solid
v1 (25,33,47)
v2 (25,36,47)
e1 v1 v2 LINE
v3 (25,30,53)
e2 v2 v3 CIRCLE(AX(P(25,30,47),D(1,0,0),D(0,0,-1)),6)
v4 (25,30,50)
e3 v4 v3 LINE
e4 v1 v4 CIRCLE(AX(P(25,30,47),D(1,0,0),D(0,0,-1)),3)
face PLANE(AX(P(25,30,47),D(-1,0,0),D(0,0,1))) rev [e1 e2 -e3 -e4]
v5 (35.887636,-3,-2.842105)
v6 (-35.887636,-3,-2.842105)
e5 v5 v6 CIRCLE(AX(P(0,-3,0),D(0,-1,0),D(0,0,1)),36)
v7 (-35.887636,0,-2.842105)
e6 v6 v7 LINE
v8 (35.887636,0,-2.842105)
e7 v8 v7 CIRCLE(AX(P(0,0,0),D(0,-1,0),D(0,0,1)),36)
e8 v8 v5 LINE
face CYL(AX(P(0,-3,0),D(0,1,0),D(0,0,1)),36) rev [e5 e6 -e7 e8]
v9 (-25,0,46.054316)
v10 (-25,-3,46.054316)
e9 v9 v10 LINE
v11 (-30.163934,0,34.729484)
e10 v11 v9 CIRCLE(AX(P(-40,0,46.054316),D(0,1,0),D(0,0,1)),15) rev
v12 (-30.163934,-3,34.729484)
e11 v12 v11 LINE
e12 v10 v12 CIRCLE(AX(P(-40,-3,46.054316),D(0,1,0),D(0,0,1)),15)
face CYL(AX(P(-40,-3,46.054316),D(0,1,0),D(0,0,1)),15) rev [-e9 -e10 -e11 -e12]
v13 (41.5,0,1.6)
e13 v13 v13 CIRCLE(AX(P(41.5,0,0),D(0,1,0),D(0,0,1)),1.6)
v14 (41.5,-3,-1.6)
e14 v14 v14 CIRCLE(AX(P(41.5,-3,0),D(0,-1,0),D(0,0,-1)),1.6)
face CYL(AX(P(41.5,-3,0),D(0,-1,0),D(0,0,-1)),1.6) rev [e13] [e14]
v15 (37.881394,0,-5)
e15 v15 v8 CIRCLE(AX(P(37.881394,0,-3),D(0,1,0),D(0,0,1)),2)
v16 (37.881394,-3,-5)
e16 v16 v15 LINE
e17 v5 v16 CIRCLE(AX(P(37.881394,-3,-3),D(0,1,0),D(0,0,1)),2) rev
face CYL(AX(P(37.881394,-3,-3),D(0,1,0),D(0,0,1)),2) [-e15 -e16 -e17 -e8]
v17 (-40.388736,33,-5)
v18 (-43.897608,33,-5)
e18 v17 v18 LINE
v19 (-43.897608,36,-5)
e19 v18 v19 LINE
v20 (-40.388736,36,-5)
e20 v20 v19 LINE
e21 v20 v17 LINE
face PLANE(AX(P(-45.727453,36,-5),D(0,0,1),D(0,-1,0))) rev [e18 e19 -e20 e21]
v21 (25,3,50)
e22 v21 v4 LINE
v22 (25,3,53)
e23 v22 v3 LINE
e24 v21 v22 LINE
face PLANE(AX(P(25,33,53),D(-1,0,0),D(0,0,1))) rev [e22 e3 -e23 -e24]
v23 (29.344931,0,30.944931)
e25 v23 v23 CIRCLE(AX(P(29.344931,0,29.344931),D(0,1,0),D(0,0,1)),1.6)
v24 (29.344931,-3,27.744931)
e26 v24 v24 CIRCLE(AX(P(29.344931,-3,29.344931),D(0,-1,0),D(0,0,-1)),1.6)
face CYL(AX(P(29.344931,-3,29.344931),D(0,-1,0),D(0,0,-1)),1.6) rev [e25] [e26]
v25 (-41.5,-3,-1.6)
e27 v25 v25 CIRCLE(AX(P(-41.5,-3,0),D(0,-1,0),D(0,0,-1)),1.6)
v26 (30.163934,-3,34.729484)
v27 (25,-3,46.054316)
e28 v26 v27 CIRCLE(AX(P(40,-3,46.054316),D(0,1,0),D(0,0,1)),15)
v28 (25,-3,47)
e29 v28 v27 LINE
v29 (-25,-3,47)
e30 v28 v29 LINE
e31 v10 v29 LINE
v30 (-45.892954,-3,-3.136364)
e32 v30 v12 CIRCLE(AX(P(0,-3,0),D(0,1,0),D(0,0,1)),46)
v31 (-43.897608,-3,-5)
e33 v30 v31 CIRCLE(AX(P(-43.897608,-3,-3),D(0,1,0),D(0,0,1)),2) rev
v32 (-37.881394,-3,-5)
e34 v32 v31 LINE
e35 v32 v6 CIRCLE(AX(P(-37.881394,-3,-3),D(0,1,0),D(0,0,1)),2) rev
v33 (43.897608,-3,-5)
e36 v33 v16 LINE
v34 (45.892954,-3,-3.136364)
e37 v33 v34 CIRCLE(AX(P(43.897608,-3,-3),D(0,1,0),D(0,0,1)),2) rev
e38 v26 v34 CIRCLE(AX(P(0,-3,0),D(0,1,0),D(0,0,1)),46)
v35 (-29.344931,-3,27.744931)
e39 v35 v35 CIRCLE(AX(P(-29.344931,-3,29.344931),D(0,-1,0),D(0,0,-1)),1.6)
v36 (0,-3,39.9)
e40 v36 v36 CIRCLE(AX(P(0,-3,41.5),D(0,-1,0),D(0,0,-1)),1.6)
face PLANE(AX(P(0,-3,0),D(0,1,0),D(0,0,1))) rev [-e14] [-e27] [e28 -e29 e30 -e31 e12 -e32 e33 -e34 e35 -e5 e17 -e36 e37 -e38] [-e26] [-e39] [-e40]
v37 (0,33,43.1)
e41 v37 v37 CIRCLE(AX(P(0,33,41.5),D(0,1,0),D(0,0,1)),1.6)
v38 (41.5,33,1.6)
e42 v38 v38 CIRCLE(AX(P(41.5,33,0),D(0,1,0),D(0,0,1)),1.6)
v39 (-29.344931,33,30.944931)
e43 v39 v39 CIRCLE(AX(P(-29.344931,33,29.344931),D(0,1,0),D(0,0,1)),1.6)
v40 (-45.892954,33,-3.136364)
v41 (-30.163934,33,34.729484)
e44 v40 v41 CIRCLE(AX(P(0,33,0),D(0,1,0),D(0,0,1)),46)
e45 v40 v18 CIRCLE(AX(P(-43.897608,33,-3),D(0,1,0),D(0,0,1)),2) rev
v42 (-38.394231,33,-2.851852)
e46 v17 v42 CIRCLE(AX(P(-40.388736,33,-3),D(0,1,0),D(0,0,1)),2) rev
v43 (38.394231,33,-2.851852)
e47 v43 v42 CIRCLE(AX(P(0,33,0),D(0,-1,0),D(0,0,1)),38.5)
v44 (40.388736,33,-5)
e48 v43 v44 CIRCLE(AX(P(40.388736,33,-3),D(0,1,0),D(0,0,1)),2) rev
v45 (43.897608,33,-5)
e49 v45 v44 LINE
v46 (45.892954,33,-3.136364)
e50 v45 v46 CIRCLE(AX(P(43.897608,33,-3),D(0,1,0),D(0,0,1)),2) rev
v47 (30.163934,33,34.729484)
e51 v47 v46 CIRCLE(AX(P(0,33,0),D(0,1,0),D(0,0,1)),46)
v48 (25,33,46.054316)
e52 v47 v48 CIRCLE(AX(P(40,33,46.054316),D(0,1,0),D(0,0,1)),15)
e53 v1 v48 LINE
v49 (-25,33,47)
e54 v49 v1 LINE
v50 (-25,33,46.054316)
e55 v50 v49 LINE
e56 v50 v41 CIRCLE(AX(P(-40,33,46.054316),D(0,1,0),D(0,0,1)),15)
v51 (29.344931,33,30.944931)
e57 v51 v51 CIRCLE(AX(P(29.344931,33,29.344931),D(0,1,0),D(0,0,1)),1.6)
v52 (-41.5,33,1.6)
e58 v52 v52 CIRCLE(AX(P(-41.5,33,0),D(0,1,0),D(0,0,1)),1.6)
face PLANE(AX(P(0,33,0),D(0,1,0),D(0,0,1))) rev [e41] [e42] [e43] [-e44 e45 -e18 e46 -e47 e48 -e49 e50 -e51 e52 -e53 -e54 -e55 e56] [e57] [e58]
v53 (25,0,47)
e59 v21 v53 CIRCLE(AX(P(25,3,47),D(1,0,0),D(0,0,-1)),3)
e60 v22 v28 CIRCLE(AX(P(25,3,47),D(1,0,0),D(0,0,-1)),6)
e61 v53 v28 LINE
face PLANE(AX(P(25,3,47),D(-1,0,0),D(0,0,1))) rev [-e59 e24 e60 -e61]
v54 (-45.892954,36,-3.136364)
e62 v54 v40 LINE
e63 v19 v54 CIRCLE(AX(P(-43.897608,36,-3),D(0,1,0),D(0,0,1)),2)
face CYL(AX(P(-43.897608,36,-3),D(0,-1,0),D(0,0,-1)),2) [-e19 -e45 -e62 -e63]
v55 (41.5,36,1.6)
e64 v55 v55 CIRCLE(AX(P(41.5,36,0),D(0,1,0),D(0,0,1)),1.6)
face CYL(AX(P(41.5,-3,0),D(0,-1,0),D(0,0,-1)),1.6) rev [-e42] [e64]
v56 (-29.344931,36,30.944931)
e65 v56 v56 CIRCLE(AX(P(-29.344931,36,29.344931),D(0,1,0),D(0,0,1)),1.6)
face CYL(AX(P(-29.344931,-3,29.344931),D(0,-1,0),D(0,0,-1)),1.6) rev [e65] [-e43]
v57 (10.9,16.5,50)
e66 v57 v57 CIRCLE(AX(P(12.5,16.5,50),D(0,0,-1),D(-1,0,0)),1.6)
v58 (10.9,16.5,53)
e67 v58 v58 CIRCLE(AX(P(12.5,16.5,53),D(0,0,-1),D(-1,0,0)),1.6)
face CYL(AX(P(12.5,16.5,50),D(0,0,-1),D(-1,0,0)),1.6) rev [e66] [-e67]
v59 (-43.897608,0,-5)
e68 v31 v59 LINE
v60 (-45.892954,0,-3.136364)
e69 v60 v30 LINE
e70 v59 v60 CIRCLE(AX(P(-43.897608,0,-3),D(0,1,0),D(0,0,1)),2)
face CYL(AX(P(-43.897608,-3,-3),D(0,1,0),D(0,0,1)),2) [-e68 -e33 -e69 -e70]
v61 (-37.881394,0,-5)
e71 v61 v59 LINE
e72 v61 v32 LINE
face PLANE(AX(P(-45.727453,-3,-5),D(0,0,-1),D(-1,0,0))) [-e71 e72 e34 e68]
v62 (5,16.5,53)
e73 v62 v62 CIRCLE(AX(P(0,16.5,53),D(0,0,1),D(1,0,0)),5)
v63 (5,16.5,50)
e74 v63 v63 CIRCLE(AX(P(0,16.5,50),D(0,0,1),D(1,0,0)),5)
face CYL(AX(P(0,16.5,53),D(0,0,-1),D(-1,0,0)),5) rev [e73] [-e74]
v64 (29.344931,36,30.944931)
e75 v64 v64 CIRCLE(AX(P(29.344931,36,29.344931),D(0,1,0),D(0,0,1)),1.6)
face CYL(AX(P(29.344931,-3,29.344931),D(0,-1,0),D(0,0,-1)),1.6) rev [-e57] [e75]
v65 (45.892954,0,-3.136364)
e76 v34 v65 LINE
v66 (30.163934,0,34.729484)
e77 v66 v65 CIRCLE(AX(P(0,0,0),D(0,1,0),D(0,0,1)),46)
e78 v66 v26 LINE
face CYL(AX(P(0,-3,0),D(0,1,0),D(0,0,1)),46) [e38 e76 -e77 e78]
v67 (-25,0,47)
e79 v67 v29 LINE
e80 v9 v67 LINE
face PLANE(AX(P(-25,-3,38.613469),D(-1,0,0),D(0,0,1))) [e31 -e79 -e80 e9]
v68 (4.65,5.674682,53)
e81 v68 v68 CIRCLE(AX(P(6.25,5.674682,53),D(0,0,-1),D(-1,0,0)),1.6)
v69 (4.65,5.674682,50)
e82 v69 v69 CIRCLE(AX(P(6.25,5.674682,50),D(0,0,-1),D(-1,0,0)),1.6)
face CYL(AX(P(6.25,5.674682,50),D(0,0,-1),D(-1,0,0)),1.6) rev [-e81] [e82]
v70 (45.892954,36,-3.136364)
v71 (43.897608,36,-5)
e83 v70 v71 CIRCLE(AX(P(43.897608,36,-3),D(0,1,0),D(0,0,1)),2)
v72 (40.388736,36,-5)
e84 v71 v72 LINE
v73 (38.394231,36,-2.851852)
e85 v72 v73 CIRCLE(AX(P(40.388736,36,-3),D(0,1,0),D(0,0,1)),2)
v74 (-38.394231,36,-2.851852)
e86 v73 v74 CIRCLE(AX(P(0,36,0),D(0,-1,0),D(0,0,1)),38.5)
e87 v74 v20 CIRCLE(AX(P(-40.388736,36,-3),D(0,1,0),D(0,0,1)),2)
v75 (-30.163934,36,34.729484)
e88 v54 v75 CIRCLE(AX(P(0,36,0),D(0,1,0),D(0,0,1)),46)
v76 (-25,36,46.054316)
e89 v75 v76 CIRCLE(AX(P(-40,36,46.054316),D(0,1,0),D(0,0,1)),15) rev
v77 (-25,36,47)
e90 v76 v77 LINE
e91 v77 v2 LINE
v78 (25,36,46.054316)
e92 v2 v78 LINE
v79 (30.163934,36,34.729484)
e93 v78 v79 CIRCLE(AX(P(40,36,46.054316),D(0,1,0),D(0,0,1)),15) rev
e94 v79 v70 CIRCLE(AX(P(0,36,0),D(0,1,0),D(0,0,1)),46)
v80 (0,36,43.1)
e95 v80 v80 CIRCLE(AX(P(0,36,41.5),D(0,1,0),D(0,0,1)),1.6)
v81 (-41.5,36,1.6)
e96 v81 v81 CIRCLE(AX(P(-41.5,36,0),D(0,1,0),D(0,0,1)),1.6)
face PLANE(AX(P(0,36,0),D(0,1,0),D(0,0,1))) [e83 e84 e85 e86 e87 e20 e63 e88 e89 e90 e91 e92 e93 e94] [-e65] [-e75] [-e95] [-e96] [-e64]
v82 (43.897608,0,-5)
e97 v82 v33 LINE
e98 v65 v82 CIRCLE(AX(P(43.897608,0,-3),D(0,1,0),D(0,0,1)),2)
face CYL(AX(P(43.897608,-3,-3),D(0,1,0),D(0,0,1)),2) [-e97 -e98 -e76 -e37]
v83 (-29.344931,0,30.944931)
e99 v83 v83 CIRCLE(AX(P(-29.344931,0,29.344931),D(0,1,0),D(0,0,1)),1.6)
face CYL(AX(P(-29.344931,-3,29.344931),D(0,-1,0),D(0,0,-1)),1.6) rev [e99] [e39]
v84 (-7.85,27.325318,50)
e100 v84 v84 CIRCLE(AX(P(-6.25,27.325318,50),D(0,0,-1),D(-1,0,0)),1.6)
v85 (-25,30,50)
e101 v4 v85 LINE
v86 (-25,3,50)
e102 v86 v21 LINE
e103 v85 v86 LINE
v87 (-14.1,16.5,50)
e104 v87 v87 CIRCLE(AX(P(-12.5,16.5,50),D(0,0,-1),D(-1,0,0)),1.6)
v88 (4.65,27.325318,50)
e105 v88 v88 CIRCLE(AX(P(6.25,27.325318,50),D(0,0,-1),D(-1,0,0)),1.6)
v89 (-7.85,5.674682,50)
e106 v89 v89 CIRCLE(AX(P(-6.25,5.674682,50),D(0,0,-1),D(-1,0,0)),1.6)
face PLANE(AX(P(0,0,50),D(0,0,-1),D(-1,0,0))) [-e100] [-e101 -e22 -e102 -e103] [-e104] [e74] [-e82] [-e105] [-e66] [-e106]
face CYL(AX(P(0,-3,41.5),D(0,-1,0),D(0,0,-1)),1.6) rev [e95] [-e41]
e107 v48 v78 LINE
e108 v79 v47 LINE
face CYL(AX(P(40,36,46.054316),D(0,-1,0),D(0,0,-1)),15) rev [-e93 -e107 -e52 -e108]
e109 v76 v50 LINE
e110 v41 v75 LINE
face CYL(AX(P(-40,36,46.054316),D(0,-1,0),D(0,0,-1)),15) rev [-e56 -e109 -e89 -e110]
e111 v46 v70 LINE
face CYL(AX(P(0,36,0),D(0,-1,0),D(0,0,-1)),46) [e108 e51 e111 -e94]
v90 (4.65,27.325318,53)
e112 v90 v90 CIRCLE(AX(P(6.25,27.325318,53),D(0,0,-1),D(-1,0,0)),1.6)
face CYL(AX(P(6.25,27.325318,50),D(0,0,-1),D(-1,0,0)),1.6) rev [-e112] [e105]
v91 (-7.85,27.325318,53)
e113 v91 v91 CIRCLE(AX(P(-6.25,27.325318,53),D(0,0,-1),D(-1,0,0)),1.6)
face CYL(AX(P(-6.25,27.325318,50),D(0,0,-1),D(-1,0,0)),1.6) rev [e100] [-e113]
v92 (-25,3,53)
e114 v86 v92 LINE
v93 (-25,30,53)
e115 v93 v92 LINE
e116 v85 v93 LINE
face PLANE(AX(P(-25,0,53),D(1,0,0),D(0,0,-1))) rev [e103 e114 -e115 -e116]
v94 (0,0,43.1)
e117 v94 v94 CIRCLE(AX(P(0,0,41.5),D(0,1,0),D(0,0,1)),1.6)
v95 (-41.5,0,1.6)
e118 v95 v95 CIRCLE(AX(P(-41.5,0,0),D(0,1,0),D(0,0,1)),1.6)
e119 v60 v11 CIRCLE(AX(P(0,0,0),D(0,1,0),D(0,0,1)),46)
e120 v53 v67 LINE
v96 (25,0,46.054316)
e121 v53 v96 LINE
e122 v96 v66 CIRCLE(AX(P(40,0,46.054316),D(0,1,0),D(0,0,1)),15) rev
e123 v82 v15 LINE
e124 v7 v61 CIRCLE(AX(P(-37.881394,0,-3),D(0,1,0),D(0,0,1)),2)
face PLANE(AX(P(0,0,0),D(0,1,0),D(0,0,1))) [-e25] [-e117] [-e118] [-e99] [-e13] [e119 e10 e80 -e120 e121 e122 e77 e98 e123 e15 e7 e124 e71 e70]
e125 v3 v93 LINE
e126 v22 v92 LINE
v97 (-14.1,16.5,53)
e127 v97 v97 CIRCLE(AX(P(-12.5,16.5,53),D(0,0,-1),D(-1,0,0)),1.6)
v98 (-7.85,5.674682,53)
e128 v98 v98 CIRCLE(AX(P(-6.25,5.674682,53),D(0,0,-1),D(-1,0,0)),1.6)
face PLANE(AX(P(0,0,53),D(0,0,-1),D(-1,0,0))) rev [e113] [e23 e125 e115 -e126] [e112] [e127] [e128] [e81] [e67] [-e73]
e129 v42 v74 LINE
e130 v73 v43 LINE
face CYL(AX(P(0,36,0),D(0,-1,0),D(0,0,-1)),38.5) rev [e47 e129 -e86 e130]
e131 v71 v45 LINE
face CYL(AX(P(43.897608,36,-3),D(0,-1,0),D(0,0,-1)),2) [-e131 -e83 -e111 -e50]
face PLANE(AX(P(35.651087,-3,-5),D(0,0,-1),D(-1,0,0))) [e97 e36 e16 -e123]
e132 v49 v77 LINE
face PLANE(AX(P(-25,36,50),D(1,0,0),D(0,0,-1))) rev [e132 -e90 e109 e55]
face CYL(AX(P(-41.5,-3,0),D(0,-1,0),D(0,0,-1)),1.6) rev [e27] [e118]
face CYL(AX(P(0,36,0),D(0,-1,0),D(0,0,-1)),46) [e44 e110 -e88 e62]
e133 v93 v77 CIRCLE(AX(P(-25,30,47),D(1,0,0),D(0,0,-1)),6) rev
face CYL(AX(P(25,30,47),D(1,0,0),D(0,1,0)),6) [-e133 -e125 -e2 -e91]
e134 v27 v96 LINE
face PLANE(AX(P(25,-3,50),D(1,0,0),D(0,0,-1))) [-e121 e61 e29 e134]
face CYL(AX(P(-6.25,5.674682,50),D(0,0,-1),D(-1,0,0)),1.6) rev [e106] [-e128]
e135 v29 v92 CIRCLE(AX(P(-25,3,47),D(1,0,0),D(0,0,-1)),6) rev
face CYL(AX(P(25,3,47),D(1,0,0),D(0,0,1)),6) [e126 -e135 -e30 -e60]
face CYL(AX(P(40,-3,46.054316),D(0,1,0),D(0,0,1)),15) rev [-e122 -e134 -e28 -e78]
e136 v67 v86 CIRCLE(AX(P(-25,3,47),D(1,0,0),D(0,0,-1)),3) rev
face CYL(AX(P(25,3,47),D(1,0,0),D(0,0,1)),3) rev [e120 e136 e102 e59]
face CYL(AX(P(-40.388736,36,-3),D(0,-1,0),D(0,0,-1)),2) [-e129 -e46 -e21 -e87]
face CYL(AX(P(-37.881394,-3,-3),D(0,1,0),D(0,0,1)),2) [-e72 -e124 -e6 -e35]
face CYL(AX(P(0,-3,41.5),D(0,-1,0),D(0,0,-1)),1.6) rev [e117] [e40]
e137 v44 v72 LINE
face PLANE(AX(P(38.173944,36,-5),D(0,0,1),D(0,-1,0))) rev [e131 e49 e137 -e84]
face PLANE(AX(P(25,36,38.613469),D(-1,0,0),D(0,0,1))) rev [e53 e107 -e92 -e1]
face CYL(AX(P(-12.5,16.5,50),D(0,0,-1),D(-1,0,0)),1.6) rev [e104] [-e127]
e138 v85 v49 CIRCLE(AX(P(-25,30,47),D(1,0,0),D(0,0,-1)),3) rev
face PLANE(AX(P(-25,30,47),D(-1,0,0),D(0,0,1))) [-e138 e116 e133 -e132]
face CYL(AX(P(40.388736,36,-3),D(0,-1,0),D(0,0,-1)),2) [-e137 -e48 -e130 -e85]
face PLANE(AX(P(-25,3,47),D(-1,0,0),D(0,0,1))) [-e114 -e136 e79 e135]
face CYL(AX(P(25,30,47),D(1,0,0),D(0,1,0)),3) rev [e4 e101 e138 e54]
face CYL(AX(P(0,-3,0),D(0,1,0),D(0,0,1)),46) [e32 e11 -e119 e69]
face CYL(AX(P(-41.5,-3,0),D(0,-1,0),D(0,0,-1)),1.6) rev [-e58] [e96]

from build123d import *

# Parameters (mm, degrees)
SKETCH1_R                    = 1
BASE_FLANGE1_DEPTH           = 3
EDGE_FLANGE1_STRIP_W         = 18
EDGE_FLANGE1_STRIP_H         = 3
EDGE_FLANGE1_STRIP_CUT_DEPTH = 50
EDGE_FLANGE1_DEPTH           = 50
EDGE_FLANGE1_START           = 3
EDGE_FLANGE1_PROFILE_W       = 50
EDGE_FLANGE1_PROFILE_H       = 30
EDGE_FLANGE1_PROFILE_R       = 1
EDGE_FLANGE1_PROFILE_R_2     = 5
EDGE_FLANGE1_FLAT_DEPTH      = 3
EDGE_FLANGE2_STRIP_W         = 18
EDGE_FLANGE2_STRIP_H         = 3
EDGE_FLANGE2_STRIP_CUT_DEPTH = 50
EDGE_FLANGE2_DEPTH           = 50
EDGE_FLANGE2_START           = 3
EDGE_FLANGE2_PROFILE_R       = 1
EDGE_FLANGE2_FLAT_DEPTH      = 3
FILLET1_R                    = 15
FILLET2_R                    = 2
M3_CLEARANCE_HOLE1_D         = 3.2
M3_CLEARANCE_HOLE1_DEPTH     = 136
M3_CLEARANCE_HOLE1_TIP       = 0.96137699
M3_CLEARANCE_HOLE2_D         = 3.2
M3_CLEARANCE_HOLE2_DEPTH     = 136
M3_CLEARANCE_HOLE2_TIP       = 0.96137699


# Sheet-metal steps are written as plain solids
with BuildPart() as part:
    # Sketch1 → Base-Flange1 (new body)
    with BuildSketch(Plane(origin=(0, 0, 0), x_dir=(1, 0, 0), z_dir=(0, 1, 0))):
        with BuildLine():
            Line((-45.727453461, 5), (-35.65108694, 5))
            ThreePointArc((-35.65108694, 5), (0, -36), (35.65108694, 5))
            Line((35.65108694, 5), (45.727453461, 5))
            ThreePointArc((45.727453461, 5), (41.546682673, -19.745205972), (25, -38.613469153))
            Line((25, -38.613469153), (25, -50))
            Line((25, -50), (-25, -50))
            Line((-25, -50), (-25, -38.613469153))
            ThreePointArc((-25, -38.613469153), (-41.546682673, -19.745205972), (-45.727453461, 5))
        make_face()
        with Locations(Location((-41.5, 0, 0), (0, 0, 270))):
            Circle(SKETCH1_R, mode=Mode.SUBTRACT)
        with Locations(Location((41.5, 0, 0), (0, 0, 270))):
            Circle(SKETCH1_R, mode=Mode.SUBTRACT)
        with Locations(Location((-29.344931419, -29.344931419, 0), (0, 0, 270))):
            Circle(SKETCH1_R, mode=Mode.SUBTRACT)
        with Locations(Location((0, -41.5, 0), (0, 0, 270))):
            Circle(SKETCH1_R, mode=Mode.SUBTRACT)
        with Locations(Location((29.344931419, -29.344931419, 0), (0, 0, 270))):
            Circle(SKETCH1_R, mode=Mode.SUBTRACT)
    extrude(amount=-BASE_FLANGE1_DEPTH)

    # Edge-Flange1 strip (across the edge) → Edge-Flange1 strip cut (cut)
    with BuildSketch(Plane(origin=(-25, 0, 50), x_dir=(0, 0, -1), z_dir=(1, 0, 0))):
        with Locations((-6, -1.5)):
            Rectangle(EDGE_FLANGE1_STRIP_W, EDGE_FLANGE1_STRIP_H)
    extrude(amount=EDGE_FLANGE1_STRIP_CUT_DEPTH, mode=Mode.SUBTRACT)

    # Edge-Flange1 bend section (across the edge) → Edge-Flange1 (add)
    with BuildSketch(Plane(origin=(-25, 0, 50), x_dir=(0, 0, -1), z_dir=(1, 0, 0))):
        with BuildLine():
            Line((-3, 3), (0, 3))
            ThreePointArc((0, 3), (0.878679656, 0.878679656), (3, 0))
            Line((3, 0), (3, -3))
            ThreePointArc((3, -3), (-1.242640687, -1.242640687), (-3, 3))
        make_face()
    extrude(amount=EDGE_FLANGE1_DEPTH)

    # Edge-Flange1 profile (on flange) → Edge-Flange1 flat (add)
    with BuildSketch(Plane.XY.offset(50).offset(EDGE_FLANGE1_START)):
        with Locations((0, 18)):
            Rectangle(EDGE_FLANGE1_PROFILE_W, EDGE_FLANGE1_PROFILE_H)
        with Locations((-6.25, 5.674682453)):
            Circle(EDGE_FLANGE1_PROFILE_R, mode=Mode.SUBTRACT)
        with Locations((-12.5, 16.5)):
            Circle(EDGE_FLANGE1_PROFILE_R, mode=Mode.SUBTRACT)
        with Locations((6.25, 5.674682453)):
            Circle(EDGE_FLANGE1_PROFILE_R, mode=Mode.SUBTRACT)
        with Locations((0, 16.5)):
            Circle(EDGE_FLANGE1_PROFILE_R_2, mode=Mode.SUBTRACT)
        with Locations((-6.25, 27.325317547)):
            Circle(EDGE_FLANGE1_PROFILE_R, mode=Mode.SUBTRACT)
        with Locations((12.5, 16.5)):
            Circle(EDGE_FLANGE1_PROFILE_R, mode=Mode.SUBTRACT)
        with Locations((6.25, 27.325317547)):
            Circle(EDGE_FLANGE1_PROFILE_R, mode=Mode.SUBTRACT)
    extrude(amount=-EDGE_FLANGE1_FLAT_DEPTH)

    # Edge-Flange2 strip (across the edge) → Edge-Flange2 strip cut (cut)
    with BuildSketch(Plane(origin=(-25, 33, 50), x_dir=(0, -1, 0), z_dir=(1, 0, 0))):
        with Locations((-6, -1.5)):
            Rectangle(EDGE_FLANGE2_STRIP_W, EDGE_FLANGE2_STRIP_H)
    extrude(amount=EDGE_FLANGE2_STRIP_CUT_DEPTH, mode=Mode.SUBTRACT)

    # Edge-Flange2 bend section (across the edge) → Edge-Flange2 (add)
    with BuildSketch(Plane(origin=(-25, 33, 50), x_dir=(0, -1, 0), z_dir=(1, 0, 0))):
        with BuildLine():
            Line((-3, 3), (0, 3))
            ThreePointArc((0, 3), (0.878679656, 0.878679656), (3, 0))
            Line((3, 0), (3, -3))
            ThreePointArc((3, -3), (-1.242640687, -1.242640687), (-3, 3))
        make_face()
    extrude(amount=EDGE_FLANGE2_DEPTH)

    # Edge-Flange2 profile (on flange) → Edge-Flange2 flat (add)
    with BuildSketch(Plane(origin=(0, 33, 50), x_dir=(1, 0, 0), z_dir=(0, 1, 0)).offset(EDGE_FLANGE2_START)):
        with BuildLine():
            ThreePointArc((25, 11.386530847), (41.546682673, 30.254794028), (45.727453461, 55))
            Line((45.727453461, 55), (38.173943993, 55))
            ThreePointArc((38.173943993, 55), (0, 11.5), (-38.173943993, 55))
            Line((-38.173943993, 55), (-45.727453461, 55))
            ThreePointArc((-45.727453461, 55), (-41.546682673, 30.254794028), (-25, 11.386530847))
            Line((-25, 11.386530847), (-25, 3))
            Line((-25, 3), (25, 3))
            Line((25, 3), (25, 11.386530847))
        make_face()
        with Locations((29.35734241, 20.64265759)):
            Circle(EDGE_FLANGE2_PROFILE_R, mode=Mode.SUBTRACT)
        with Locations((0, 8.482448208)):
            Circle(EDGE_FLANGE2_PROFILE_R, mode=Mode.SUBTRACT)
        with Locations((-29.35734241, 20.64265759)):
            Circle(EDGE_FLANGE2_PROFILE_R, mode=Mode.SUBTRACT)
        with Locations((41.517551792, 50)):
            Circle(EDGE_FLANGE2_PROFILE_R, mode=Mode.SUBTRACT)
        with Locations((-41.517551792, 50)):
            Circle(EDGE_FLANGE2_PROFILE_R, mode=Mode.SUBTRACT)
    extrude(amount=-EDGE_FLANGE2_FLAT_DEPTH)

    # Fillet1
    fillet1_edges = [part.edges().sort_by_distance(p)[0] for p in [
        (-25, 34.5, 38.613469153),
        (25, 34.5, 38.613469153),
        (25, -1.5, 38.613469153),
        (-25, -1.5, 38.613469153),
    ]]
    fillet(fillet1_edges, radius=FILLET1_R)

    # Fillet2
    fillet2_edges = [part.edges().sort_by_distance(p)[0] for p in [
        (45.727453461, 34.5, -5),
        (38.173943993, 34.5, -5),
        (-38.173943993, 34.5, -5),
        (-45.727453461, 34.5, -5),
        (-45.727453461, -1.5, -5),
        (-35.65108694, -1.5, -5),
        (35.65108694, -1.5, -5),
        (45.727453461, -1.5, -5),
    ]]
    fillet(fillet2_edges, radius=FILLET2_R)

    # M3 Clearance Hole1
    with Locations(Plane(origin=(0, -3, 0), x_dir=(-1, 0, 0), z_dir=(0, -1, 0))):
        with Locations((41.5, 0), (29.344931419, -29.344931419), (0, -41.5), (-29.344931419, -29.344931419), (-41.5, 0)):
            Hole(M3_CLEARANCE_HOLE1_D / 2, depth=M3_CLEARANCE_HOLE1_DEPTH)
            with Locations((0, 0, -(M3_CLEARANCE_HOLE1_DEPTH + M3_CLEARANCE_HOLE1_TIP / 2))):  # 118° drill point
                Cone(0, M3_CLEARANCE_HOLE1_D / 2, M3_CLEARANCE_HOLE1_TIP, mode=Mode.SUBTRACT)

    # M3 Clearance Hole2
    with Locations(Plane(origin=(0, 0, 50), x_dir=(-1, 0, 0), z_dir=(0, 0, -1))):
        with Locations((6.25, 27.325317547), (12.5, 16.5), (6.25, 5.674682453), (-6.25, 5.674682453), (-12.5, 16.5), (-6.25, 27.325317547)):
            Hole(M3_CLEARANCE_HOLE2_D / 2, depth=M3_CLEARANCE_HOLE2_DEPTH)
            with Locations((0, 0, -(M3_CLEARANCE_HOLE2_DEPTH + M3_CLEARANCE_HOLE2_TIP / 2))):  # 118° drill point
                Cone(0, M3_CLEARANCE_HOLE2_D / 2, M3_CLEARANCE_HOLE2_TIP, mode=Mode.SUBTRACT)


solid = part.part
